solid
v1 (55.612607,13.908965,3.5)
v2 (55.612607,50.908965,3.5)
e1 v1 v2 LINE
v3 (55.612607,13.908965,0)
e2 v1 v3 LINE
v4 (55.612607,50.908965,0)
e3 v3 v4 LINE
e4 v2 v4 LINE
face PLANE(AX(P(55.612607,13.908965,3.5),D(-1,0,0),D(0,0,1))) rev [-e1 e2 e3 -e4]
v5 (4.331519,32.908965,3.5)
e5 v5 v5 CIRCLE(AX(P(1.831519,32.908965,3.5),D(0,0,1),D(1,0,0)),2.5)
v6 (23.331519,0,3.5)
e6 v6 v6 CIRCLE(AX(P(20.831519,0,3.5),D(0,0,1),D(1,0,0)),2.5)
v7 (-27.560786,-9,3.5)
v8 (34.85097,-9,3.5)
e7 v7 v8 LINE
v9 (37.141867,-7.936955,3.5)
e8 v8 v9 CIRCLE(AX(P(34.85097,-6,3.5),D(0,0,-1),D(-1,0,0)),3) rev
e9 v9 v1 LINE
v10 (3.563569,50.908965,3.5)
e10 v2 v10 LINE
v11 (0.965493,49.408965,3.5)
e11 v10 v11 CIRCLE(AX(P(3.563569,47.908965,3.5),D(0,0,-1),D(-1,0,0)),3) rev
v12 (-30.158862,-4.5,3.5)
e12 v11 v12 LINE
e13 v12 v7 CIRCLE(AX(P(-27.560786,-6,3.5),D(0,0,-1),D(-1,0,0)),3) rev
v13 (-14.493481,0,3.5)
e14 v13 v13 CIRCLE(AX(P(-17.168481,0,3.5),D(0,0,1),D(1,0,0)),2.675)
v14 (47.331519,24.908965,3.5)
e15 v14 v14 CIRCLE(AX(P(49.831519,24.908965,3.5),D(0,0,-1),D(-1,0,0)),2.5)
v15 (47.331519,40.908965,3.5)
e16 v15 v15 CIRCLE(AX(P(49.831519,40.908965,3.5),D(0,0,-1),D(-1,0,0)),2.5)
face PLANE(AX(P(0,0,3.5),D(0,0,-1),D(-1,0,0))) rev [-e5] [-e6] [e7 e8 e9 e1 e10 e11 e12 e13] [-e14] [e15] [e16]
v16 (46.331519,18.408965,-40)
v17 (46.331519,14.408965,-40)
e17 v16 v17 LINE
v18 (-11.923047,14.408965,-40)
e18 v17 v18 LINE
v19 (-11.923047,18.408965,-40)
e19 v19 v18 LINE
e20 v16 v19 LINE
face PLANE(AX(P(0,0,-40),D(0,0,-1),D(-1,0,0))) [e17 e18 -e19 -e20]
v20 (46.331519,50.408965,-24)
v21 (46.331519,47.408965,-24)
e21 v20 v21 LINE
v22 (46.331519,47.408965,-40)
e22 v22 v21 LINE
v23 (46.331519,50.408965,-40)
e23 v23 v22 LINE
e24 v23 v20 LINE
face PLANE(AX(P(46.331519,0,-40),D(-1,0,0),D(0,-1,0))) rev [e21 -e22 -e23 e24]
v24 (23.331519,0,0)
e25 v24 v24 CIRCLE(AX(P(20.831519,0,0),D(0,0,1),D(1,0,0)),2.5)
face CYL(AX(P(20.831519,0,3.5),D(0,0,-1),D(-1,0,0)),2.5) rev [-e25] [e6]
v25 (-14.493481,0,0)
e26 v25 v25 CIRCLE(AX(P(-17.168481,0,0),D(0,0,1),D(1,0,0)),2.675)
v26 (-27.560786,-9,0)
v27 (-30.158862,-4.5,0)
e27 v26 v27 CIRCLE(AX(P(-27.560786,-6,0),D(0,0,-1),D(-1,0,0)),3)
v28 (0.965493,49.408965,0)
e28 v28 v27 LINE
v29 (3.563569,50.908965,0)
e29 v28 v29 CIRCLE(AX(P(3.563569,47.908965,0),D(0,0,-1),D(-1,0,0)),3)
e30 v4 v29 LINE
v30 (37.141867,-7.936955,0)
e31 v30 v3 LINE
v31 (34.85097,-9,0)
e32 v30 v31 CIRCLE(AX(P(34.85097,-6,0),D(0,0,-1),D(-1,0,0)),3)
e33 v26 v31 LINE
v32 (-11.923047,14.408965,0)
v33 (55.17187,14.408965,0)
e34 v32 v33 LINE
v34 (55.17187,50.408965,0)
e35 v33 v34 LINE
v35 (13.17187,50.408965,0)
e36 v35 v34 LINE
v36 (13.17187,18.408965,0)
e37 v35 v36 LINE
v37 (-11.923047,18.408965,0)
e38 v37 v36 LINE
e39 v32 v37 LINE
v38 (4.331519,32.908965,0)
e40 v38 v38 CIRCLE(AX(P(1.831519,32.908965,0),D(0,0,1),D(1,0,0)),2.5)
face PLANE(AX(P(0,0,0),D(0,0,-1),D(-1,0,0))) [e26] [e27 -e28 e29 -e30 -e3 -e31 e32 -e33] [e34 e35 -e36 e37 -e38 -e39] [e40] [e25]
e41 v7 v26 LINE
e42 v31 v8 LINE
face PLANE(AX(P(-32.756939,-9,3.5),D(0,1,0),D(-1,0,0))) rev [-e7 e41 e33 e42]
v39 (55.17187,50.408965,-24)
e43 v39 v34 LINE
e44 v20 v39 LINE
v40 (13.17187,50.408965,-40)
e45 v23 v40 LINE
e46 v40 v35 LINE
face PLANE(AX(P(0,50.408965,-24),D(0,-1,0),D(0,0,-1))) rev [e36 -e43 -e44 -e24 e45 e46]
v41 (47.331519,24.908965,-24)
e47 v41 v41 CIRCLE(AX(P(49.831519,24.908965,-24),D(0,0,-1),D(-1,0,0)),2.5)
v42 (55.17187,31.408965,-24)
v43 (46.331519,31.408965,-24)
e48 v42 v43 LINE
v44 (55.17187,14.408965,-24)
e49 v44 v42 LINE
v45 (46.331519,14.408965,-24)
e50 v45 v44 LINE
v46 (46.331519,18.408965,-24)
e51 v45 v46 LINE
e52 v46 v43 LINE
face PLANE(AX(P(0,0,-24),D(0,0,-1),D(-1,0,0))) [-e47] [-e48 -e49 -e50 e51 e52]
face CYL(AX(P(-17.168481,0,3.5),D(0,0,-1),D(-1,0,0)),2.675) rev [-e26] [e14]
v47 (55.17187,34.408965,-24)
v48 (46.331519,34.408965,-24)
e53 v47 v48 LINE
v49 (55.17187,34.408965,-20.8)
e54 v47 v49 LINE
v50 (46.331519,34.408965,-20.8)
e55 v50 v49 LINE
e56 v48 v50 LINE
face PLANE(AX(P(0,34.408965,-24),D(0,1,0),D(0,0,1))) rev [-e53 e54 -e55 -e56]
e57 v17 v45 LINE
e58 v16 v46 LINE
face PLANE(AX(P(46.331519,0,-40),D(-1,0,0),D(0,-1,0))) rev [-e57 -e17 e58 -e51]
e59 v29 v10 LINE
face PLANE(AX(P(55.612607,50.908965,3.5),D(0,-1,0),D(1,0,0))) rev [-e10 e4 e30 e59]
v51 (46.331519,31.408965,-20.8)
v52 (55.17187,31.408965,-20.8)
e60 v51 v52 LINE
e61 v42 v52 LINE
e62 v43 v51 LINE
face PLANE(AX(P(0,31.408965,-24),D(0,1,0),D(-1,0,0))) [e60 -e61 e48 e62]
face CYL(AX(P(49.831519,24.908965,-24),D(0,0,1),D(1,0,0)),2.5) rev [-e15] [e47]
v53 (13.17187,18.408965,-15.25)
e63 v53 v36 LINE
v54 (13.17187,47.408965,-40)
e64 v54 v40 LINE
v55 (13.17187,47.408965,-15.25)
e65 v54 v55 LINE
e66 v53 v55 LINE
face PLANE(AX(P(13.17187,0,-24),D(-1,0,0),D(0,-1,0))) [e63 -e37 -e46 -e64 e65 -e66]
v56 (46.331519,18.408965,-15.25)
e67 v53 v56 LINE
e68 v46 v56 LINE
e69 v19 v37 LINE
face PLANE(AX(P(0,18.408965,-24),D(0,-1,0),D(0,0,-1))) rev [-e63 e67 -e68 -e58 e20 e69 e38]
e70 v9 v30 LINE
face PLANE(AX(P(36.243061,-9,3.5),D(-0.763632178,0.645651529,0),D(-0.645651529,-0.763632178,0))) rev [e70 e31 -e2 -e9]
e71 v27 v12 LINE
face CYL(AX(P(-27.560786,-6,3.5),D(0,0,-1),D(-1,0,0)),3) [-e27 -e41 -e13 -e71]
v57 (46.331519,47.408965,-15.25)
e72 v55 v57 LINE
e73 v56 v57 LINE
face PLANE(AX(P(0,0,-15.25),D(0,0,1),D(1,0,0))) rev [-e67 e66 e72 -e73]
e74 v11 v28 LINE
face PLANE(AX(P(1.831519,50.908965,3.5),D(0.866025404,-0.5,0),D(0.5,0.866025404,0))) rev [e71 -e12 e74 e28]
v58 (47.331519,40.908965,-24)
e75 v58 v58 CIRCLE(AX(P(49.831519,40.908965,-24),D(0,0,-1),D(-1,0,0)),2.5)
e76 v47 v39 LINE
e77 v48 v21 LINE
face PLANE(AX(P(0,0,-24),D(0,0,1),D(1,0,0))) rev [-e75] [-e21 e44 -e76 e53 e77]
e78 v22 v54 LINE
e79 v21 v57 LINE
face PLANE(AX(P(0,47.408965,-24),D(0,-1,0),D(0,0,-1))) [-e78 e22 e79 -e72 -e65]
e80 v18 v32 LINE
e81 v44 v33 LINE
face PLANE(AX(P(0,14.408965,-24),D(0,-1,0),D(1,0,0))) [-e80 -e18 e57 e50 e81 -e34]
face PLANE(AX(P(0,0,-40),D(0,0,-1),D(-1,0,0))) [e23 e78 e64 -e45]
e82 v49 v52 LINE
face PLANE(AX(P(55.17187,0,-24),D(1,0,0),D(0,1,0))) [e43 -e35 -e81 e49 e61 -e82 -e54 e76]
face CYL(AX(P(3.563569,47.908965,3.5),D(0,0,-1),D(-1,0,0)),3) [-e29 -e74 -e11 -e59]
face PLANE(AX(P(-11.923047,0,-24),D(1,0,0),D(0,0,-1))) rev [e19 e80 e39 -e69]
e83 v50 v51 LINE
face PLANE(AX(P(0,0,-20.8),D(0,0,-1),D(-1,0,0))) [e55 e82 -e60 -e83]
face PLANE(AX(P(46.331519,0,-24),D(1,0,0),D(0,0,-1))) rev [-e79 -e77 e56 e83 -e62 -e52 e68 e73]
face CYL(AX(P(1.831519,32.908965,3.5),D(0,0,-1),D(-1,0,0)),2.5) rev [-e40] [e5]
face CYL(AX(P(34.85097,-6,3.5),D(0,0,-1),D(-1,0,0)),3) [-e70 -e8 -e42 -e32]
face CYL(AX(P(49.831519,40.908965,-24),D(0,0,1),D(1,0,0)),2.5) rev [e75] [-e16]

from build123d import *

# Parameters (mm, degrees)
SKETCH1_R           = 2.675
SKETCH1_R_2         = 2.5
BOSS_EXTRUDE1_DEPTH = 3.5
FILLET1_R           = 3
SKETCH2_W           = 8.840351234
SKETCH2_H           = 3
SKETCH2_H_2         = 13
SKETCH2_R           = 2.5
SKETCH2_W_2         = 33.159648766
SKETCH2_R_2         = 4.125
SKETCH2_W_3         = 8.159648766
SKETCH2_H_3         = 4
BOSS_EXTRUDE2_DEPTH = 3.5
SKETCH2_4_W         = 8.840351234
SKETCH2_4_H         = 4
SKETCH2_4_H_2       = 13
SKETCH2_4_R         = 2.5
SKETCH2_4_H_3       = 3
SKETCH2_4_W_2       = 33.159648766
BOSS_EXTRUDE3_DEPTH = 24
FILLET2_R           = 3
SKETCH2_7_W         = 8.840351234
SKETCH2_7_H         = 3
BOSS_EXTRUDE5_DEPTH = 20.8
SKETCH2_9_R         = 2.5
CUT_EXTRUDE3_DEPTH  = 80.12322562
CUT_EXTRUDE1_DEPTH  = 80.12322562
SKETCH2_10_W        = 33.159648766
SKETCH2_10_H        = 3
SKETCH2_10_W_2      = 58.254565561
SKETCH2_10_H_2      = 4
BOSS_EXTRUDE6_DEPTH = 40
BOSS_EXTRUDE7_DEPTH = 15.25


with BuildPart() as part:
    # Sketch1 → Boss-Extrude1 (new body)
    with BuildSketch(Plane.XY):
        Polygon((-32.756938656, -9), (36.243061344, -9), (55.612607206, 13.908965344), (55.612607206, 50.908965344), (1.831518612, 50.908965344), align=None)
        with Locations((-17.168481388, 0)):
            Circle(SKETCH1_R, mode=Mode.SUBTRACT)
        with Locations((20.831518612, 0)):
            Circle(SKETCH1_R_2, mode=Mode.SUBTRACT)
        with Locations((1.831518612, 32.908965344)):
            Circle(SKETCH1_R_2, mode=Mode.SUBTRACT)
    extrude(amount=BOSS_EXTRUDE1_DEPTH)

    # Fillet1
    fillet1_edges = [part.edges().sort_by_distance(p)[0] for p in [
        (36.243061344, -9, 1.75),
        (-32.756938656, -9, 1.75),
        (1.831518612, 50.908965344, 1.75),
    ]]
    fillet(fillet1_edges, radius=FILLET1_R)

    # Sketch2 → Boss-Extrude2 (add)
    # profile 1 of 12: a face of its own
    with BuildSketch(Plane(origin=(0, 0, 0), x_dir=(-1, 0, 0), z_dir=(0, 0, -1))):
        with Locations((-50.751694229, 48.908965344)):
            Rectangle(SKETCH2_W, SKETCH2_H)
    # profile 2 of 12: a face of its own
    with BuildSketch(Plane(origin=(0, 0, 0), x_dir=(-1, 0, 0), z_dir=(0, 0, -1))):
        with Locations((-50.751694229, 40.908965344)):
            Rectangle(SKETCH2_W, SKETCH2_H_2)
        with Locations((-49.831518612, 40.908965344)):
            Circle(SKETCH2_R, mode=Mode.SUBTRACT)
    # profile 3 of 12: a face of its own
    with BuildSketch(Plane(origin=(0, 0, 0), x_dir=(-1, 0, 0), z_dir=(0, 0, -1))):
        with Locations((-29.751694229, 48.908965344)):
            Rectangle(SKETCH2_W_2, SKETCH2_H)
    # profile 4 of 12: a face of its own
    with BuildSketch(Plane(origin=(0, 0, 0), x_dir=(-1, 0, 0), z_dir=(0, 0, -1))):
        Polygon((-13.171869846, 47.408965344), (-46.331518612, 47.408965344), (-46.331518612, 34.408965344), (-46.331518612, 31.408965344), (-46.331518612, 18.408965344), (-13.171869846, 18.408965344), align=None)
    # profile 5 of 12: a face of its own
    with BuildSketch(Plane(origin=(0, 0, 0), x_dir=(-1, 0, 0), z_dir=(0, 0, -1))):
        with Locations((-50.751694229, 32.908965344)):
            Rectangle(SKETCH2_W, SKETCH2_H)
    # profile 6 of 12: a face of its own
    with BuildSketch(Plane(origin=(0, 0, 0), x_dir=(-1, 0, 0), z_dir=(0, 0, -1))):
        Polygon((12.168481388, 47.408965344), (-13.171869846, 47.408965344), (-13.171869846, 18.408965344), (11.923046949, 18.408965344), (12.168481388, 18.408965344), (12.168481388, 31.408965344), (12.168481388, 34.408965344), align=None)
        with Locations((-1.831518612, 32.908965344)):
            Circle(SKETCH2_R_2, mode=Mode.SUBTRACT)
    # profile 7 of 12: a face of its own
    with BuildSketch(Plane(origin=(0, 0, 0), x_dir=(-1, 0, 0), z_dir=(0, 0, -1))):
        with Locations((-50.751694229, 24.908965344)):
            Rectangle(SKETCH2_W, SKETCH2_H_2)
        with Locations((-49.831518612, 24.908965344)):
            Circle(SKETCH2_R, mode=Mode.SUBTRACT)
    # profile 8 of 12: a face of its own
    with BuildSketch(Plane(origin=(0, 0, 0), x_dir=(-1, 0, 0), z_dir=(0, 0, -1))):
        with Locations((16.248305771, 40.908965344)):
            Rectangle(SKETCH2_W_3, SKETCH2_H_2)
        with Locations((16.168481388, 40.908965344)):
            Circle(SKETCH2_R, mode=Mode.SUBTRACT)
    # profile 9 of 12: a face of its own
    with BuildSketch(Plane(origin=(0, 0, 0), x_dir=(-1, 0, 0), z_dir=(0, 0, -1))):
        Polygon((11.923046949, 18.408965344), (-13.171869846, 18.408965344), (-46.331518612, 18.408965344), (-46.331518612, 14.408965344), (11.923046949, 14.408965344), align=None)
    # profile 10 of 12: a face of its own
    with BuildSketch(Plane(origin=(0, 0, 0), x_dir=(-1, 0, 0), z_dir=(0, 0, -1))):
        with Locations((-50.751694229, 16.408965344)):
            Rectangle(SKETCH2_W, SKETCH2_H_3)
    # profile 11 of 12: a face of its own
    with BuildSketch(Plane(origin=(0, 0, 0), x_dir=(-1, 0, 0), z_dir=(0, 0, -1))):
        with Locations((16.248305771, 32.908965344)):
            Rectangle(SKETCH2_W_3, SKETCH2_H)
    # profile 12 of 12: a face of its own
    with BuildSketch(Plane(origin=(0, 0, 0), x_dir=(-1, 0, 0), z_dir=(0, 0, -1))):
        Polygon((20.328130154, 31.408965344), (12.168481388, 31.408965344), (12.168481388, 18.408965344), (16.168481388, 18.408965344), (20.328130154, 18.408965344), align=None)
        with Locations((16.168481388, 24.908965344)):
            Circle(SKETCH2_R, mode=Mode.SUBTRACT)
    extrude(amount=-BOSS_EXTRUDE2_DEPTH)

    # Sketch2<4> → Boss-Extrude3 (add)
    # profile 1 of 6: a face of its own
    with BuildSketch(Plane(origin=(0, 0, 0), x_dir=(-1, 0, 0), z_dir=(0, 0, -1))):
        Polygon((11.923046949, 18.408965344), (-13.171869846, 18.408965344), (-46.331518612, 18.408965344), (-46.331518612, 14.408965344), (11.923046949, 14.408965344), align=None)
    # profile 2 of 6: a face of its own
    with BuildSketch(Plane(origin=(0, 0, 0), x_dir=(-1, 0, 0), z_dir=(0, 0, -1))):
        with Locations((-50.751694229, 16.408965344)):
            Rectangle(SKETCH2_4_W, SKETCH2_4_H)
    # profile 3 of 6: a face of its own
    with BuildSketch(Plane(origin=(0, 0, 0), x_dir=(-1, 0, 0), z_dir=(0, 0, -1))):
        with Locations((-50.751694229, 24.908965344)):
            Rectangle(SKETCH2_4_W, SKETCH2_4_H_2)
        with Locations((-49.831518612, 24.908965344)):
            Circle(SKETCH2_4_R, mode=Mode.SUBTRACT)
    # profile 4 of 6: a face of its own
    with BuildSketch(Plane(origin=(0, 0, 0), x_dir=(-1, 0, 0), z_dir=(0, 0, -1))):
        with Locations((-50.751694229, 40.908965344)):
            Rectangle(SKETCH2_4_W, SKETCH2_4_H_2)
        with Locations((-49.831518612, 40.908965344)):
            Circle(SKETCH2_4_R, mode=Mode.SUBTRACT)
    # profile 5 of 6: a face of its own
    with BuildSketch(Plane(origin=(0, 0, 0), x_dir=(-1, 0, 0), z_dir=(0, 0, -1))):
        with Locations((-50.751694229, 48.908965344)):
            Rectangle(SKETCH2_4_W, SKETCH2_4_H_3)
    # profile 6 of 6: a face of its own
    with BuildSketch(Plane(origin=(0, 0, 0), x_dir=(-1, 0, 0), z_dir=(0, 0, -1))):
        with Locations((-29.751694229, 48.908965344)):
            Rectangle(SKETCH2_4_W_2, SKETCH2_4_H_3)
    extrude(amount=BOSS_EXTRUDE3_DEPTH)

    # Fillet2
    # the kernel refuses this fillet: 3 mm, written as the material it adds along each edge
    with BuildSketch(Plane(origin=(-16.932365136, 18.408965344, 3.5), x_dir=(-0.49999999999999933, -0.8660254037844389, 0), z_dir=(0, 0, -1))) as fillet2_piece_1:
        with BuildLine():
            CenterArc((4.697298716, 3), FILLET2_R, 181.130351539, 88.869648461)
            Line((1.697882509, 2.940818771), (1.637894185, 2.939635146))
            ThreePointArc((1.637894185, 2.939635146), (0.79697973, 1.500409385), (-0.051961524, 0.03))
            Line((-0.051961524, 0.03), (0, -0.06))
            Line((0, -0.06), (4.697298716, -0.06))
            Line((4.697298716, -0.06), (4.697298716, 0))
        make_face()
    extrude(amount=3.5)

    # Sketch2<7> → Boss-Extrude5 (add)
    with BuildSketch(Plane(origin=(0, 0, 0), x_dir=(-1, 0, 0), z_dir=(0, 0, -1))):
        with Locations((-50.751694229, 32.908965344)):
            Rectangle(SKETCH2_7_W, SKETCH2_7_H)
    extrude(amount=BOSS_EXTRUDE5_DEPTH)

    # Sketch2<9> → Cut-Extrude3 (cut, through all)
    with BuildSketch(Plane(origin=(0, 0, 0), x_dir=(-1, 0, 0), z_dir=(0, 0, -1))):
        with Locations((-49.831518612, 40.908965344)):
            Circle(SKETCH2_9_R)
        with Locations((-49.831518612, 24.908965344)):
            Circle(SKETCH2_9_R)
    extrude(amount=-CUT_EXTRUDE3_DEPTH, mode=Mode.SUBTRACT)

    # Sketch3 → Cut-Extrude1 (cut, through all)
    with BuildSketch(Plane(origin=(0, 0, 0), x_dir=(-1, 0, 0), z_dir=(0, 0, -1))):
        Polygon((-1.831518612, 50.908965344), (32.756938656, -9), (32.756938656, 50.908965344), align=None)
    extrude(amount=-CUT_EXTRUDE1_DEPTH, mode=Mode.SUBTRACT)

    # Sketch2<10> → Boss-Extrude6 (add)
    with BuildSketch(Plane(origin=(0, 0, 0), x_dir=(-1, 0, 0), z_dir=(0, 0, -1))):
        with Locations((-29.751694229, 48.908965344)):
            Rectangle(SKETCH2_10_W, SKETCH2_10_H)
        with Locations((-17.204235832, 16.408965344)):
            Rectangle(SKETCH2_10_W_2, SKETCH2_10_H_2)
    extrude(amount=BOSS_EXTRUDE6_DEPTH)

    # Sketch2<11> → Boss-Extrude7 (add)
    with BuildSketch(Plane(origin=(0, 0, 0), x_dir=(-1, 0, 0), z_dir=(0, 0, -1))):
        Polygon((-13.171869846, 47.408965344), (-46.331518612, 47.408965344), (-46.331518612, 34.408965344), (-46.331518612, 31.408965344), (-46.331518612, 18.408965344), (-13.171869846, 18.408965344), align=None)
    extrude(amount=BOSS_EXTRUDE7_DEPTH)


solid = part.part
